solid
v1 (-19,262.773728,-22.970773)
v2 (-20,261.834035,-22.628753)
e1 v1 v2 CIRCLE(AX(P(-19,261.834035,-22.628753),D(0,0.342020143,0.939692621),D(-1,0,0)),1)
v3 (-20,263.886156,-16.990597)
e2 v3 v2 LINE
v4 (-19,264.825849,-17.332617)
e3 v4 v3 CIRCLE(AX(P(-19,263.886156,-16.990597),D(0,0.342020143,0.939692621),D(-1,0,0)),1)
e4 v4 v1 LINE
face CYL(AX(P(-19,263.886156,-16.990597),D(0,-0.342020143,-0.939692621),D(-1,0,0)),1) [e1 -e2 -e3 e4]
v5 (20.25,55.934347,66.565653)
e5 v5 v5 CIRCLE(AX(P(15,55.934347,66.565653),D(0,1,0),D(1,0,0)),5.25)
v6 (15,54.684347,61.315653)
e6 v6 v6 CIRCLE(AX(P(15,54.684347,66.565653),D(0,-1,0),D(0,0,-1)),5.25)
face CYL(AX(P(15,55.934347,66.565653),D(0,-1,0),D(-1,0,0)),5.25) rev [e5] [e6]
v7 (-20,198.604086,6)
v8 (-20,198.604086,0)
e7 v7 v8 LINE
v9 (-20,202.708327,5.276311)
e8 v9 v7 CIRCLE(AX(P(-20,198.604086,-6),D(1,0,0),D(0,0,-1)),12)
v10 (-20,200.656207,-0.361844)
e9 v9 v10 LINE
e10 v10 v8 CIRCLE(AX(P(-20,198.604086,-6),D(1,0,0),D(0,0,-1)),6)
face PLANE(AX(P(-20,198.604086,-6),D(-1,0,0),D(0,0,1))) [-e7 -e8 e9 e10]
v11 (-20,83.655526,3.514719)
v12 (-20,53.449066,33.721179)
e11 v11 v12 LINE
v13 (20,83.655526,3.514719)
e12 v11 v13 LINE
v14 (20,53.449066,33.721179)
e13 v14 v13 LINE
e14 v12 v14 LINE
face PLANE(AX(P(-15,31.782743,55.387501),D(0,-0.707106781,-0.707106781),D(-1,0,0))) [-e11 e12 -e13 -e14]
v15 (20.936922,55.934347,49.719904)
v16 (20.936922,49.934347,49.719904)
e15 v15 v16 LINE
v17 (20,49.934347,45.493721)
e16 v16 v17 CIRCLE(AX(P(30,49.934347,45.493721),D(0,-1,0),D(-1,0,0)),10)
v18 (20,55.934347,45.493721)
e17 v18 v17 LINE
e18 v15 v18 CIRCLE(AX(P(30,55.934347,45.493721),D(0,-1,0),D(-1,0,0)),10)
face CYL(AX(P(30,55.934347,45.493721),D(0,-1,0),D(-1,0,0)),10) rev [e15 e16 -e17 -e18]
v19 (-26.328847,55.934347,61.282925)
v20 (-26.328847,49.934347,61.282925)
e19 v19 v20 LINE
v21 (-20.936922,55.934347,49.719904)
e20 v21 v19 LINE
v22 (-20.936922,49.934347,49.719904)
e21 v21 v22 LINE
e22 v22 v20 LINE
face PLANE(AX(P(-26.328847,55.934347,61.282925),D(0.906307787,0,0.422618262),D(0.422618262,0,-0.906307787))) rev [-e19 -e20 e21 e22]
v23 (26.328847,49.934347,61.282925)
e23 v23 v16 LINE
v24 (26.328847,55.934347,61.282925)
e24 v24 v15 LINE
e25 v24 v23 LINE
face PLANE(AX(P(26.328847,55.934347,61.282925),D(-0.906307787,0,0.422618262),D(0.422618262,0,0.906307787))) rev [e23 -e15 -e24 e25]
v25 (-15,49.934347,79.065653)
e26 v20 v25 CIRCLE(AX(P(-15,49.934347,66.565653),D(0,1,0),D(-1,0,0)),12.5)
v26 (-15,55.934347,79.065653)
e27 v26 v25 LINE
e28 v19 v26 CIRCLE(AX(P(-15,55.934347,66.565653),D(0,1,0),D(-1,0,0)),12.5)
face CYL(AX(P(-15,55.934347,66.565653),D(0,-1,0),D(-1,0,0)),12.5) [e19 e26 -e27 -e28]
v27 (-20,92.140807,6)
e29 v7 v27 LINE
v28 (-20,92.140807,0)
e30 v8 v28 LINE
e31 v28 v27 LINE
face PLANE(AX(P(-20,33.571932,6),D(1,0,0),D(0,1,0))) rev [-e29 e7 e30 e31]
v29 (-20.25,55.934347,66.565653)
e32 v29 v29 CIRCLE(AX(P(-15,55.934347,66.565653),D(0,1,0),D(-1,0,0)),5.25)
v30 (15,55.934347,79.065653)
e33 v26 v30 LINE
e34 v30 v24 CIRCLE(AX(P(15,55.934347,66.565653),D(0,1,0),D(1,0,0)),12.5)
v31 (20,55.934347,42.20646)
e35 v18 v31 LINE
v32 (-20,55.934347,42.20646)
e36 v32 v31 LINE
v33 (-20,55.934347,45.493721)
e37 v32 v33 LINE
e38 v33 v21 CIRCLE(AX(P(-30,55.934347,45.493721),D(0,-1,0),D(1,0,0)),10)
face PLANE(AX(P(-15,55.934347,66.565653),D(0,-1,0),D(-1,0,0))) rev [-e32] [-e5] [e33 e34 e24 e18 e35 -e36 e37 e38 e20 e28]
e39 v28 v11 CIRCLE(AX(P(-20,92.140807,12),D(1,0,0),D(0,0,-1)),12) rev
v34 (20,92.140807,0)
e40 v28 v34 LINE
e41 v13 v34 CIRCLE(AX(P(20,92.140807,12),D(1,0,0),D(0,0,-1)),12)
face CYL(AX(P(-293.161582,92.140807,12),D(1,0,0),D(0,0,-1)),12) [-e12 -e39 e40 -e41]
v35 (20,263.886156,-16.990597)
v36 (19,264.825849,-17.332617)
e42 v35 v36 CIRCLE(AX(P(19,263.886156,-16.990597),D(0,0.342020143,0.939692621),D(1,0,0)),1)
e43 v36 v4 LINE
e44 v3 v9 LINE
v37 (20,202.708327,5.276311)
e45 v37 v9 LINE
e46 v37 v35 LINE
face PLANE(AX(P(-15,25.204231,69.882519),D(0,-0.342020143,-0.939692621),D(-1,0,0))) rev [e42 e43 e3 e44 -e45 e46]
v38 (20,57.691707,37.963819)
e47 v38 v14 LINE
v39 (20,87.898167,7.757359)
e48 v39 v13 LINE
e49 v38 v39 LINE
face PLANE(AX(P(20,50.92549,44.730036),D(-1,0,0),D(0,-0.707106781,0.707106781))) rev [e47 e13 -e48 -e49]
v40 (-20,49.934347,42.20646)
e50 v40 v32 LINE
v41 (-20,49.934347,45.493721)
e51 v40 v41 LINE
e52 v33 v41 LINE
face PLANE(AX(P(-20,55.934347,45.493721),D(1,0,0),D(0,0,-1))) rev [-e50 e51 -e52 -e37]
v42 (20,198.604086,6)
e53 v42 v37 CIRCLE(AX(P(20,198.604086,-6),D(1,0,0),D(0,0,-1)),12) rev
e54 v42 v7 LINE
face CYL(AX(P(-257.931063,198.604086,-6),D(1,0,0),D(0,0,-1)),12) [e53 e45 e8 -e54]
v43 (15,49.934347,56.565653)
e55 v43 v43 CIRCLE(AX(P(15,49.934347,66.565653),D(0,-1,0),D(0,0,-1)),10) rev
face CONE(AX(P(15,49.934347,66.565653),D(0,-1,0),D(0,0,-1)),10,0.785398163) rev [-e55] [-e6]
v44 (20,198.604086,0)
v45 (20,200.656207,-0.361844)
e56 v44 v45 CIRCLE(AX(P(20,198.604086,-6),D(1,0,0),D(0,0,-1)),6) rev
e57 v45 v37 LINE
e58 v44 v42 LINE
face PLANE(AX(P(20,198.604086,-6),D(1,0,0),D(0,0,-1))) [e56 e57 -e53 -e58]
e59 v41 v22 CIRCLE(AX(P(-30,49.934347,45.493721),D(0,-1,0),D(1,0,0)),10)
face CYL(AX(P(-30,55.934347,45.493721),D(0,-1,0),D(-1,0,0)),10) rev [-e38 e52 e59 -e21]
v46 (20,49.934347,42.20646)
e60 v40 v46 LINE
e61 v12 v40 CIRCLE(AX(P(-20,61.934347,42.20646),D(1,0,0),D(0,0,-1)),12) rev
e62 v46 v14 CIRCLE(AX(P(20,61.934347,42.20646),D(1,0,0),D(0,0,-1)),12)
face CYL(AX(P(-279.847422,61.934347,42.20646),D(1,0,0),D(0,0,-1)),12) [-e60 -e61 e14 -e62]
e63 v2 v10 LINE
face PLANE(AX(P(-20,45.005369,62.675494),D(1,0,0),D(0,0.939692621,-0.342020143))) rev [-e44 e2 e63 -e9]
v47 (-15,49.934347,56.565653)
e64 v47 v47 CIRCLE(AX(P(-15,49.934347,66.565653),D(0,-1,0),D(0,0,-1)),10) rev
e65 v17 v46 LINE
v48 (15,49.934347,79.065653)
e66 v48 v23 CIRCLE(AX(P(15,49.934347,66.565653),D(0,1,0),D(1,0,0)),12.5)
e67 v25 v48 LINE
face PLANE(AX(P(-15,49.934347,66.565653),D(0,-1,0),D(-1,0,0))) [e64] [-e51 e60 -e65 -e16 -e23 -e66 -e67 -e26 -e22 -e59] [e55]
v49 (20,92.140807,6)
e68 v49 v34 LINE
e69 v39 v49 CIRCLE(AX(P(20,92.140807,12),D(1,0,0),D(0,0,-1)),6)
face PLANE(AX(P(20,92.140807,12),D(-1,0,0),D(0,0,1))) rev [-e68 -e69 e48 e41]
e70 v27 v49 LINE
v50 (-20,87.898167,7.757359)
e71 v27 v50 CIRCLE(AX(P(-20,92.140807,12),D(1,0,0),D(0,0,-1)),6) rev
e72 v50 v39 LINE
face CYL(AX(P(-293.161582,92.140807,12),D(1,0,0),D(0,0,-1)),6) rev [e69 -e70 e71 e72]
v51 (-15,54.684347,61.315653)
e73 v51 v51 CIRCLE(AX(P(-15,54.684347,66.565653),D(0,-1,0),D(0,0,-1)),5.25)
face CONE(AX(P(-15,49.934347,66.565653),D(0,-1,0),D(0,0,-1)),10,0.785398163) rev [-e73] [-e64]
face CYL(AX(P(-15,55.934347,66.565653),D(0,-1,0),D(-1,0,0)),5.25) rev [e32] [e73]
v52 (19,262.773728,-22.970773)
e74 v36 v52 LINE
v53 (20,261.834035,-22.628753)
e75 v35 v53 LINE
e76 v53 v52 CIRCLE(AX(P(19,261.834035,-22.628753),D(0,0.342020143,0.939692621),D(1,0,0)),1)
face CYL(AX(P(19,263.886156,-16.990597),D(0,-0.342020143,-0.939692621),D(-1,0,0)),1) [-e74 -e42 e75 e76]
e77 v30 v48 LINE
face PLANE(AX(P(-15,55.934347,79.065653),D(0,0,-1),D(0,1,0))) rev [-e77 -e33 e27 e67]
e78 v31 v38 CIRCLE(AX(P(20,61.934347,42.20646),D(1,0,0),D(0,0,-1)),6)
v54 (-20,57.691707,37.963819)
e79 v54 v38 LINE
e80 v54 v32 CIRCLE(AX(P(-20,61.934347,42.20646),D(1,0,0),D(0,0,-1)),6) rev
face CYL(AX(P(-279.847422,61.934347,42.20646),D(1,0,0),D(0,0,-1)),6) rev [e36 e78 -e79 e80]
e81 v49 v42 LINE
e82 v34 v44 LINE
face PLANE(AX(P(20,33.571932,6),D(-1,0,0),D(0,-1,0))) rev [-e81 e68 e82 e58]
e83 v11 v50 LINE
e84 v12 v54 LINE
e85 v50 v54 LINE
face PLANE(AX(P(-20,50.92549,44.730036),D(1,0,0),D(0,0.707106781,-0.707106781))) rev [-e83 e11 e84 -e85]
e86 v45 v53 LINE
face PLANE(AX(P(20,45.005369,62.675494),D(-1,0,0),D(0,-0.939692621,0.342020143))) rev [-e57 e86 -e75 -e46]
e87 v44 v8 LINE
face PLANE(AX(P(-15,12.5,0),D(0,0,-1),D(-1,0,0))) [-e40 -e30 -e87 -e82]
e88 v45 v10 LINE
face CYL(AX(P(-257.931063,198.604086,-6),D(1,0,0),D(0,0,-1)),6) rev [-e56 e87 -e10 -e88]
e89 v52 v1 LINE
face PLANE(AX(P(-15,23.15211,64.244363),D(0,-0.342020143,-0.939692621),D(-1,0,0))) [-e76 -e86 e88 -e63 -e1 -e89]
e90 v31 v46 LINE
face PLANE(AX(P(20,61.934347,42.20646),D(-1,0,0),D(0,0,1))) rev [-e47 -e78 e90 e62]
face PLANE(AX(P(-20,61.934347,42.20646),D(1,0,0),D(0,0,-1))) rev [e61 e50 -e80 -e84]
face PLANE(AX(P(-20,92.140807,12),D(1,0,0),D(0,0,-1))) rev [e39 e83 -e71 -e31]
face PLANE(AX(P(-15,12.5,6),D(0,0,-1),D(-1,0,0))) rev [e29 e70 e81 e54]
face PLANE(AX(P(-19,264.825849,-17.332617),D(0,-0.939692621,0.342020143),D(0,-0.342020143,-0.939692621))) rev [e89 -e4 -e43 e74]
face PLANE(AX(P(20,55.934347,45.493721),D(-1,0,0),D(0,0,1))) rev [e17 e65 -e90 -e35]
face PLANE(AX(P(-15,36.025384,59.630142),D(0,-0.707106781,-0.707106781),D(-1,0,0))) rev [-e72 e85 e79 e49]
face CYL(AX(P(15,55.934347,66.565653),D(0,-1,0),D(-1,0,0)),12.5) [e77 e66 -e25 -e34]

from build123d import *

# Parameters (mm, degrees)
SKETCH1_R                  = 5.25
EXTRUDE1_DEPTH             = 6
PROCESS_BENDS1_START       = -28
PROCESS_BENDS1_DEPTH       = 56
PROCESS_BENDS1_START_2     = -20
PROCESS_BENDS1_2_DEPTH     = 40
PROCESS_BENDS1_START_3     = -27.5
PROCESS_BENDS1_3_DEPTH     = 55
PROCESS_BENDS1_START_4     = 67
PROCESS_BENDS1_4_DEPTH     = 8
PROCESS_BENDS1_START_5     = 49.934347195
PROCESS_BENDS1_5_OUTLINE_R = 5.25
PROCESS_BENDS1_5_DEPTH     = 43.065652805
CHAMFER1_SIZE              = 4.75


with BuildPart() as part:
    # Sketch1 → Extrude1 (new body)
    with BuildSketch(Plane.XY):
        with BuildLine():
            Line((-15, 0), (15, 0))
            ThreePointArc((15, 0), (25.542393073, 5.783754896), (26.328847338, 17.782728272))
            Line((26.328847338, 17.782728272), (20.93692213, 29.345749196))
            ThreePointArc((20.93692213, 29.345749196), (20.237039929, 31.407535674), (20, 33.571931813))
            Line((20, 33.571931813), (20, 266.5))
            ThreePointArc((20, 266.5), (19.707106781, 267.207106781), (19, 267.5))
            Line((19, 267.5), (-19, 267.5))
            ThreePointArc((-19, 267.5), (-19.707106781, 267.207106781), (-20, 266.5))
            Line((-20, 266.5), (-20, 33.571931813))
            ThreePointArc((-20, 33.571931813), (-20.237039929, 31.407535674), (-20.93692213, 29.345749196))
            Line((-20.93692213, 29.345749196), (-26.328847338, 17.782728272))
            ThreePointArc((-26.328847338, 17.782728272), (-25.542393073, 5.783754896), (-15, 0))
        make_face()
        with Locations((15, 12.5)):
            Circle(SKETCH1_R, mode=Mode.SUBTRACT)
        with Locations(Location((-15, 12.5, 0), (0, 0, 180))):
            Circle(SKETCH1_R, mode=Mode.SUBTRACT)
    extrude(amount=EXTRUDE1_DEPTH)

    # Process-Bends1: read off the stored shape, not the designer's step
    # Process-Bends1 outline → Process-Bends1 (cut)
    with BuildSketch(Plane.YZ.offset(PROCESS_BENDS1_START)):
        with BuildLine():
            Line((202.708327384, 5.276311449), (217.204873948, 0))
            Line((217.204873948, 0), (267.5, 0))
            Line((267.5, 0), (267.5, 6))
            Line((267.5, 6), (198.604085664, 6))
            ThreePointArc((198.604085664, 6), (200.687863796, 5.817693036), (202.708327384, 5.276311449))
        make_face()
        with BuildLine():
            Line((0, 0), (92.140807255, 0))
            ThreePointArc((92.140807255, 0), (87.548606067, 0.91344561), (83.655525881, 3.514718626))
            Line((83.655525881, 3.514718626), (81.170244507, 6))
            Line((81.170244507, 6), (0, 6))
            Line((0, 6), (0, 0))
        make_face()
    extrude(amount=PROCESS_BENDS1_DEPTH, mode=Mode.SUBTRACT)

    # Process-Bends1 2 outline → Process-Bends1 2 (add)
    with BuildSketch(Plane.YZ.offset(PROCESS_BENDS1_START_2)):
        with BuildLine():
            Line((262.773728027, -22.970773129), (264.825848887, -17.332617404))
            Line((264.825848887, -17.332617404), (217.204873948, 0))
            Line((217.204873948, 0), (198.604085664, 0))
            ThreePointArc((198.604085664, 0), (199.64597473, -0.091153482), (200.656206524, -0.361844275))
            Line((200.656206524, -0.361844275), (262.773728027, -22.970773129))
        make_face()
        with BuildLine():
            Line((81.170244507, 6), (92.140807255, 6))
            ThreePointArc((92.140807255, 6), (89.844706661, 6.456722805), (87.898166568, 7.757359313))
            Line((87.898166568, 7.757359313), (57.691706508, 37.963819374))
            ThreePointArc((57.691706508, 37.963819374), (56.39107, 39.910359467), (55.934347195, 42.206460061))
            Line((55.934347195, 42.206460061), (55.934347195, 79.065652805))
            Line((55.934347195, 79.065652805), (49.934347195, 79.065652805))
            Line((49.934347195, 79.065652805), (49.934347195, 42.206460061))
            ThreePointArc((49.934347195, 42.206460061), (50.847792805, 37.614258872), (53.44906582, 33.721178686))
            Line((53.44906582, 33.721178686), (81.170244507, 6))
        make_face()
    extrude(amount=PROCESS_BENDS1_2_DEPTH)

    # Process-Bends1 3 outline → Process-Bends1 3 (add)
    with BuildSketch(Plane.YZ.offset(PROCESS_BENDS1_START_3)):
        with BuildLine():
            Line((81.170244507, 6), (92.140807255, 6))
            ThreePointArc((92.140807255, 6), (89.844706661, 6.456722805), (87.898166568, 7.757359313))
            Line((87.898166568, 7.757359313), (57.691706508, 37.963819374))
            ThreePointArc((57.691706508, 37.963819374), (56.39107, 39.910359467), (55.934347195, 42.206460061))
            Line((55.934347195, 42.206460061), (55.934347195, 79.065652805))
            Line((55.934347195, 79.065652805), (49.934347195, 79.065652805))
            Line((49.934347195, 79.065652805), (49.934347195, 42.206460061))
            ThreePointArc((49.934347195, 42.206460061), (50.847792805, 37.614258872), (53.44906582, 33.721178686))
            Line((53.44906582, 33.721178686), (81.170244507, 6))
        make_face()
    extrude(amount=PROCESS_BENDS1_3_DEPTH)

    # Process-Bends1 4 outline → Process-Bends1 4 (cut)
    with BuildSketch(Plane(origin=(0, 0, 0), x_dir=(1, 0, 0), z_dir=(0, 0.3420201433256691, 0.9396926207859083)).offset(PROCESS_BENDS1_START_4)):
        with BuildLine():
            Line((20, 254.783000281), (19, 254.783000281))
            ThreePointArc((19, 254.783000281), (19.707106781, 254.490107062), (20, 253.783000281))
            Line((20, 253.783000281), (20, 254.783000281))
        make_face()
        with BuildLine():
            ThreePointArc((-20, 253.783000281), (-19.707106781, 254.490107062), (-19, 254.783000281))
            Line((-19, 254.783000281), (-20, 254.783000281))
            Line((-20, 254.783000281), (-20, 253.783000281))
        make_face()
    extrude(amount=PROCESS_BENDS1_4_DEPTH, mode=Mode.SUBTRACT)

    # Process-Bends1 5 outline → Process-Bends1 5 (cut)
    with BuildSketch(Plane(origin=(0, 0, 0), x_dir=(1, 0, 0), z_dir=(0, 1, 0)).offset(PROCESS_BENDS1_START_5)):
        with BuildLine():
            ThreePointArc((-20.93692213, -49.719903609), (-20.237039929, -47.658117131), (-20, -45.493720992))
            Line((-20, -45.493720992), (-20, -6))
            Line((-20, -6), (-27.5, -6))
            Line((-27.5, -6), (-27.5, -66.565652806))
            ThreePointArc((-27.5, -66.565652806), (-27.203700089, -63.860157632), (-26.328847338, -61.282924534))
            Line((-26.328847338, -61.282924534), (-20.93692213, -49.719903609))
        make_face()
        with BuildLine():
            ThreePointArc((26.328847338, -61.282924534), (27.203700089, -63.860157632), (27.5, -66.565652806))
            Line((27.5, -66.565652806), (27.5, -6))
            Line((27.5, -6), (20, -6))
            Line((20, -6), (20, -45.493720992))
            ThreePointArc((20, -45.493720992), (20.237039929, -47.658117131), (20.93692213, -49.719903609))
            Line((20.93692213, -49.719903609), (26.328847338, -61.282924534))
        make_face()
        with BuildLine():
            ThreePointArc((27.5, -66.565652806), (23.838834765, -75.404487571), (15, -79.065652805))
            Line((15, -79.065652805), (27.5, -79.065652805))
            Line((27.5, -79.065652805), (27.5, -66.565652806))
        make_face()
        with BuildLine():
            ThreePointArc((-15, -79.065652805), (-23.838834765, -75.404487571), (-27.5, -66.565652806))
            Line((-27.5, -66.565652806), (-27.5, -79.065652805))
            Line((-27.5, -79.065652805), (-15, -79.065652805))
        make_face()
        with Locations((-15, -66.565652805)):
            Circle(PROCESS_BENDS1_5_OUTLINE_R)
        with Locations((15, -66.565652805)):
            Circle(PROCESS_BENDS1_5_OUTLINE_R)
    extrude(amount=PROCESS_BENDS1_5_DEPTH, mode=Mode.SUBTRACT)

    # Chamfer1
    chamfer1_edges = [part.edges().sort_by_distance(p)[0] for p in [
        (9.75, 49.934347195, 66.565652805),
        (-20.25, 49.934347195, 66.565652805),
    ]]
    chamfer(chamfer1_edges, length=CHAMFER1_SIZE)


solid = part.part
